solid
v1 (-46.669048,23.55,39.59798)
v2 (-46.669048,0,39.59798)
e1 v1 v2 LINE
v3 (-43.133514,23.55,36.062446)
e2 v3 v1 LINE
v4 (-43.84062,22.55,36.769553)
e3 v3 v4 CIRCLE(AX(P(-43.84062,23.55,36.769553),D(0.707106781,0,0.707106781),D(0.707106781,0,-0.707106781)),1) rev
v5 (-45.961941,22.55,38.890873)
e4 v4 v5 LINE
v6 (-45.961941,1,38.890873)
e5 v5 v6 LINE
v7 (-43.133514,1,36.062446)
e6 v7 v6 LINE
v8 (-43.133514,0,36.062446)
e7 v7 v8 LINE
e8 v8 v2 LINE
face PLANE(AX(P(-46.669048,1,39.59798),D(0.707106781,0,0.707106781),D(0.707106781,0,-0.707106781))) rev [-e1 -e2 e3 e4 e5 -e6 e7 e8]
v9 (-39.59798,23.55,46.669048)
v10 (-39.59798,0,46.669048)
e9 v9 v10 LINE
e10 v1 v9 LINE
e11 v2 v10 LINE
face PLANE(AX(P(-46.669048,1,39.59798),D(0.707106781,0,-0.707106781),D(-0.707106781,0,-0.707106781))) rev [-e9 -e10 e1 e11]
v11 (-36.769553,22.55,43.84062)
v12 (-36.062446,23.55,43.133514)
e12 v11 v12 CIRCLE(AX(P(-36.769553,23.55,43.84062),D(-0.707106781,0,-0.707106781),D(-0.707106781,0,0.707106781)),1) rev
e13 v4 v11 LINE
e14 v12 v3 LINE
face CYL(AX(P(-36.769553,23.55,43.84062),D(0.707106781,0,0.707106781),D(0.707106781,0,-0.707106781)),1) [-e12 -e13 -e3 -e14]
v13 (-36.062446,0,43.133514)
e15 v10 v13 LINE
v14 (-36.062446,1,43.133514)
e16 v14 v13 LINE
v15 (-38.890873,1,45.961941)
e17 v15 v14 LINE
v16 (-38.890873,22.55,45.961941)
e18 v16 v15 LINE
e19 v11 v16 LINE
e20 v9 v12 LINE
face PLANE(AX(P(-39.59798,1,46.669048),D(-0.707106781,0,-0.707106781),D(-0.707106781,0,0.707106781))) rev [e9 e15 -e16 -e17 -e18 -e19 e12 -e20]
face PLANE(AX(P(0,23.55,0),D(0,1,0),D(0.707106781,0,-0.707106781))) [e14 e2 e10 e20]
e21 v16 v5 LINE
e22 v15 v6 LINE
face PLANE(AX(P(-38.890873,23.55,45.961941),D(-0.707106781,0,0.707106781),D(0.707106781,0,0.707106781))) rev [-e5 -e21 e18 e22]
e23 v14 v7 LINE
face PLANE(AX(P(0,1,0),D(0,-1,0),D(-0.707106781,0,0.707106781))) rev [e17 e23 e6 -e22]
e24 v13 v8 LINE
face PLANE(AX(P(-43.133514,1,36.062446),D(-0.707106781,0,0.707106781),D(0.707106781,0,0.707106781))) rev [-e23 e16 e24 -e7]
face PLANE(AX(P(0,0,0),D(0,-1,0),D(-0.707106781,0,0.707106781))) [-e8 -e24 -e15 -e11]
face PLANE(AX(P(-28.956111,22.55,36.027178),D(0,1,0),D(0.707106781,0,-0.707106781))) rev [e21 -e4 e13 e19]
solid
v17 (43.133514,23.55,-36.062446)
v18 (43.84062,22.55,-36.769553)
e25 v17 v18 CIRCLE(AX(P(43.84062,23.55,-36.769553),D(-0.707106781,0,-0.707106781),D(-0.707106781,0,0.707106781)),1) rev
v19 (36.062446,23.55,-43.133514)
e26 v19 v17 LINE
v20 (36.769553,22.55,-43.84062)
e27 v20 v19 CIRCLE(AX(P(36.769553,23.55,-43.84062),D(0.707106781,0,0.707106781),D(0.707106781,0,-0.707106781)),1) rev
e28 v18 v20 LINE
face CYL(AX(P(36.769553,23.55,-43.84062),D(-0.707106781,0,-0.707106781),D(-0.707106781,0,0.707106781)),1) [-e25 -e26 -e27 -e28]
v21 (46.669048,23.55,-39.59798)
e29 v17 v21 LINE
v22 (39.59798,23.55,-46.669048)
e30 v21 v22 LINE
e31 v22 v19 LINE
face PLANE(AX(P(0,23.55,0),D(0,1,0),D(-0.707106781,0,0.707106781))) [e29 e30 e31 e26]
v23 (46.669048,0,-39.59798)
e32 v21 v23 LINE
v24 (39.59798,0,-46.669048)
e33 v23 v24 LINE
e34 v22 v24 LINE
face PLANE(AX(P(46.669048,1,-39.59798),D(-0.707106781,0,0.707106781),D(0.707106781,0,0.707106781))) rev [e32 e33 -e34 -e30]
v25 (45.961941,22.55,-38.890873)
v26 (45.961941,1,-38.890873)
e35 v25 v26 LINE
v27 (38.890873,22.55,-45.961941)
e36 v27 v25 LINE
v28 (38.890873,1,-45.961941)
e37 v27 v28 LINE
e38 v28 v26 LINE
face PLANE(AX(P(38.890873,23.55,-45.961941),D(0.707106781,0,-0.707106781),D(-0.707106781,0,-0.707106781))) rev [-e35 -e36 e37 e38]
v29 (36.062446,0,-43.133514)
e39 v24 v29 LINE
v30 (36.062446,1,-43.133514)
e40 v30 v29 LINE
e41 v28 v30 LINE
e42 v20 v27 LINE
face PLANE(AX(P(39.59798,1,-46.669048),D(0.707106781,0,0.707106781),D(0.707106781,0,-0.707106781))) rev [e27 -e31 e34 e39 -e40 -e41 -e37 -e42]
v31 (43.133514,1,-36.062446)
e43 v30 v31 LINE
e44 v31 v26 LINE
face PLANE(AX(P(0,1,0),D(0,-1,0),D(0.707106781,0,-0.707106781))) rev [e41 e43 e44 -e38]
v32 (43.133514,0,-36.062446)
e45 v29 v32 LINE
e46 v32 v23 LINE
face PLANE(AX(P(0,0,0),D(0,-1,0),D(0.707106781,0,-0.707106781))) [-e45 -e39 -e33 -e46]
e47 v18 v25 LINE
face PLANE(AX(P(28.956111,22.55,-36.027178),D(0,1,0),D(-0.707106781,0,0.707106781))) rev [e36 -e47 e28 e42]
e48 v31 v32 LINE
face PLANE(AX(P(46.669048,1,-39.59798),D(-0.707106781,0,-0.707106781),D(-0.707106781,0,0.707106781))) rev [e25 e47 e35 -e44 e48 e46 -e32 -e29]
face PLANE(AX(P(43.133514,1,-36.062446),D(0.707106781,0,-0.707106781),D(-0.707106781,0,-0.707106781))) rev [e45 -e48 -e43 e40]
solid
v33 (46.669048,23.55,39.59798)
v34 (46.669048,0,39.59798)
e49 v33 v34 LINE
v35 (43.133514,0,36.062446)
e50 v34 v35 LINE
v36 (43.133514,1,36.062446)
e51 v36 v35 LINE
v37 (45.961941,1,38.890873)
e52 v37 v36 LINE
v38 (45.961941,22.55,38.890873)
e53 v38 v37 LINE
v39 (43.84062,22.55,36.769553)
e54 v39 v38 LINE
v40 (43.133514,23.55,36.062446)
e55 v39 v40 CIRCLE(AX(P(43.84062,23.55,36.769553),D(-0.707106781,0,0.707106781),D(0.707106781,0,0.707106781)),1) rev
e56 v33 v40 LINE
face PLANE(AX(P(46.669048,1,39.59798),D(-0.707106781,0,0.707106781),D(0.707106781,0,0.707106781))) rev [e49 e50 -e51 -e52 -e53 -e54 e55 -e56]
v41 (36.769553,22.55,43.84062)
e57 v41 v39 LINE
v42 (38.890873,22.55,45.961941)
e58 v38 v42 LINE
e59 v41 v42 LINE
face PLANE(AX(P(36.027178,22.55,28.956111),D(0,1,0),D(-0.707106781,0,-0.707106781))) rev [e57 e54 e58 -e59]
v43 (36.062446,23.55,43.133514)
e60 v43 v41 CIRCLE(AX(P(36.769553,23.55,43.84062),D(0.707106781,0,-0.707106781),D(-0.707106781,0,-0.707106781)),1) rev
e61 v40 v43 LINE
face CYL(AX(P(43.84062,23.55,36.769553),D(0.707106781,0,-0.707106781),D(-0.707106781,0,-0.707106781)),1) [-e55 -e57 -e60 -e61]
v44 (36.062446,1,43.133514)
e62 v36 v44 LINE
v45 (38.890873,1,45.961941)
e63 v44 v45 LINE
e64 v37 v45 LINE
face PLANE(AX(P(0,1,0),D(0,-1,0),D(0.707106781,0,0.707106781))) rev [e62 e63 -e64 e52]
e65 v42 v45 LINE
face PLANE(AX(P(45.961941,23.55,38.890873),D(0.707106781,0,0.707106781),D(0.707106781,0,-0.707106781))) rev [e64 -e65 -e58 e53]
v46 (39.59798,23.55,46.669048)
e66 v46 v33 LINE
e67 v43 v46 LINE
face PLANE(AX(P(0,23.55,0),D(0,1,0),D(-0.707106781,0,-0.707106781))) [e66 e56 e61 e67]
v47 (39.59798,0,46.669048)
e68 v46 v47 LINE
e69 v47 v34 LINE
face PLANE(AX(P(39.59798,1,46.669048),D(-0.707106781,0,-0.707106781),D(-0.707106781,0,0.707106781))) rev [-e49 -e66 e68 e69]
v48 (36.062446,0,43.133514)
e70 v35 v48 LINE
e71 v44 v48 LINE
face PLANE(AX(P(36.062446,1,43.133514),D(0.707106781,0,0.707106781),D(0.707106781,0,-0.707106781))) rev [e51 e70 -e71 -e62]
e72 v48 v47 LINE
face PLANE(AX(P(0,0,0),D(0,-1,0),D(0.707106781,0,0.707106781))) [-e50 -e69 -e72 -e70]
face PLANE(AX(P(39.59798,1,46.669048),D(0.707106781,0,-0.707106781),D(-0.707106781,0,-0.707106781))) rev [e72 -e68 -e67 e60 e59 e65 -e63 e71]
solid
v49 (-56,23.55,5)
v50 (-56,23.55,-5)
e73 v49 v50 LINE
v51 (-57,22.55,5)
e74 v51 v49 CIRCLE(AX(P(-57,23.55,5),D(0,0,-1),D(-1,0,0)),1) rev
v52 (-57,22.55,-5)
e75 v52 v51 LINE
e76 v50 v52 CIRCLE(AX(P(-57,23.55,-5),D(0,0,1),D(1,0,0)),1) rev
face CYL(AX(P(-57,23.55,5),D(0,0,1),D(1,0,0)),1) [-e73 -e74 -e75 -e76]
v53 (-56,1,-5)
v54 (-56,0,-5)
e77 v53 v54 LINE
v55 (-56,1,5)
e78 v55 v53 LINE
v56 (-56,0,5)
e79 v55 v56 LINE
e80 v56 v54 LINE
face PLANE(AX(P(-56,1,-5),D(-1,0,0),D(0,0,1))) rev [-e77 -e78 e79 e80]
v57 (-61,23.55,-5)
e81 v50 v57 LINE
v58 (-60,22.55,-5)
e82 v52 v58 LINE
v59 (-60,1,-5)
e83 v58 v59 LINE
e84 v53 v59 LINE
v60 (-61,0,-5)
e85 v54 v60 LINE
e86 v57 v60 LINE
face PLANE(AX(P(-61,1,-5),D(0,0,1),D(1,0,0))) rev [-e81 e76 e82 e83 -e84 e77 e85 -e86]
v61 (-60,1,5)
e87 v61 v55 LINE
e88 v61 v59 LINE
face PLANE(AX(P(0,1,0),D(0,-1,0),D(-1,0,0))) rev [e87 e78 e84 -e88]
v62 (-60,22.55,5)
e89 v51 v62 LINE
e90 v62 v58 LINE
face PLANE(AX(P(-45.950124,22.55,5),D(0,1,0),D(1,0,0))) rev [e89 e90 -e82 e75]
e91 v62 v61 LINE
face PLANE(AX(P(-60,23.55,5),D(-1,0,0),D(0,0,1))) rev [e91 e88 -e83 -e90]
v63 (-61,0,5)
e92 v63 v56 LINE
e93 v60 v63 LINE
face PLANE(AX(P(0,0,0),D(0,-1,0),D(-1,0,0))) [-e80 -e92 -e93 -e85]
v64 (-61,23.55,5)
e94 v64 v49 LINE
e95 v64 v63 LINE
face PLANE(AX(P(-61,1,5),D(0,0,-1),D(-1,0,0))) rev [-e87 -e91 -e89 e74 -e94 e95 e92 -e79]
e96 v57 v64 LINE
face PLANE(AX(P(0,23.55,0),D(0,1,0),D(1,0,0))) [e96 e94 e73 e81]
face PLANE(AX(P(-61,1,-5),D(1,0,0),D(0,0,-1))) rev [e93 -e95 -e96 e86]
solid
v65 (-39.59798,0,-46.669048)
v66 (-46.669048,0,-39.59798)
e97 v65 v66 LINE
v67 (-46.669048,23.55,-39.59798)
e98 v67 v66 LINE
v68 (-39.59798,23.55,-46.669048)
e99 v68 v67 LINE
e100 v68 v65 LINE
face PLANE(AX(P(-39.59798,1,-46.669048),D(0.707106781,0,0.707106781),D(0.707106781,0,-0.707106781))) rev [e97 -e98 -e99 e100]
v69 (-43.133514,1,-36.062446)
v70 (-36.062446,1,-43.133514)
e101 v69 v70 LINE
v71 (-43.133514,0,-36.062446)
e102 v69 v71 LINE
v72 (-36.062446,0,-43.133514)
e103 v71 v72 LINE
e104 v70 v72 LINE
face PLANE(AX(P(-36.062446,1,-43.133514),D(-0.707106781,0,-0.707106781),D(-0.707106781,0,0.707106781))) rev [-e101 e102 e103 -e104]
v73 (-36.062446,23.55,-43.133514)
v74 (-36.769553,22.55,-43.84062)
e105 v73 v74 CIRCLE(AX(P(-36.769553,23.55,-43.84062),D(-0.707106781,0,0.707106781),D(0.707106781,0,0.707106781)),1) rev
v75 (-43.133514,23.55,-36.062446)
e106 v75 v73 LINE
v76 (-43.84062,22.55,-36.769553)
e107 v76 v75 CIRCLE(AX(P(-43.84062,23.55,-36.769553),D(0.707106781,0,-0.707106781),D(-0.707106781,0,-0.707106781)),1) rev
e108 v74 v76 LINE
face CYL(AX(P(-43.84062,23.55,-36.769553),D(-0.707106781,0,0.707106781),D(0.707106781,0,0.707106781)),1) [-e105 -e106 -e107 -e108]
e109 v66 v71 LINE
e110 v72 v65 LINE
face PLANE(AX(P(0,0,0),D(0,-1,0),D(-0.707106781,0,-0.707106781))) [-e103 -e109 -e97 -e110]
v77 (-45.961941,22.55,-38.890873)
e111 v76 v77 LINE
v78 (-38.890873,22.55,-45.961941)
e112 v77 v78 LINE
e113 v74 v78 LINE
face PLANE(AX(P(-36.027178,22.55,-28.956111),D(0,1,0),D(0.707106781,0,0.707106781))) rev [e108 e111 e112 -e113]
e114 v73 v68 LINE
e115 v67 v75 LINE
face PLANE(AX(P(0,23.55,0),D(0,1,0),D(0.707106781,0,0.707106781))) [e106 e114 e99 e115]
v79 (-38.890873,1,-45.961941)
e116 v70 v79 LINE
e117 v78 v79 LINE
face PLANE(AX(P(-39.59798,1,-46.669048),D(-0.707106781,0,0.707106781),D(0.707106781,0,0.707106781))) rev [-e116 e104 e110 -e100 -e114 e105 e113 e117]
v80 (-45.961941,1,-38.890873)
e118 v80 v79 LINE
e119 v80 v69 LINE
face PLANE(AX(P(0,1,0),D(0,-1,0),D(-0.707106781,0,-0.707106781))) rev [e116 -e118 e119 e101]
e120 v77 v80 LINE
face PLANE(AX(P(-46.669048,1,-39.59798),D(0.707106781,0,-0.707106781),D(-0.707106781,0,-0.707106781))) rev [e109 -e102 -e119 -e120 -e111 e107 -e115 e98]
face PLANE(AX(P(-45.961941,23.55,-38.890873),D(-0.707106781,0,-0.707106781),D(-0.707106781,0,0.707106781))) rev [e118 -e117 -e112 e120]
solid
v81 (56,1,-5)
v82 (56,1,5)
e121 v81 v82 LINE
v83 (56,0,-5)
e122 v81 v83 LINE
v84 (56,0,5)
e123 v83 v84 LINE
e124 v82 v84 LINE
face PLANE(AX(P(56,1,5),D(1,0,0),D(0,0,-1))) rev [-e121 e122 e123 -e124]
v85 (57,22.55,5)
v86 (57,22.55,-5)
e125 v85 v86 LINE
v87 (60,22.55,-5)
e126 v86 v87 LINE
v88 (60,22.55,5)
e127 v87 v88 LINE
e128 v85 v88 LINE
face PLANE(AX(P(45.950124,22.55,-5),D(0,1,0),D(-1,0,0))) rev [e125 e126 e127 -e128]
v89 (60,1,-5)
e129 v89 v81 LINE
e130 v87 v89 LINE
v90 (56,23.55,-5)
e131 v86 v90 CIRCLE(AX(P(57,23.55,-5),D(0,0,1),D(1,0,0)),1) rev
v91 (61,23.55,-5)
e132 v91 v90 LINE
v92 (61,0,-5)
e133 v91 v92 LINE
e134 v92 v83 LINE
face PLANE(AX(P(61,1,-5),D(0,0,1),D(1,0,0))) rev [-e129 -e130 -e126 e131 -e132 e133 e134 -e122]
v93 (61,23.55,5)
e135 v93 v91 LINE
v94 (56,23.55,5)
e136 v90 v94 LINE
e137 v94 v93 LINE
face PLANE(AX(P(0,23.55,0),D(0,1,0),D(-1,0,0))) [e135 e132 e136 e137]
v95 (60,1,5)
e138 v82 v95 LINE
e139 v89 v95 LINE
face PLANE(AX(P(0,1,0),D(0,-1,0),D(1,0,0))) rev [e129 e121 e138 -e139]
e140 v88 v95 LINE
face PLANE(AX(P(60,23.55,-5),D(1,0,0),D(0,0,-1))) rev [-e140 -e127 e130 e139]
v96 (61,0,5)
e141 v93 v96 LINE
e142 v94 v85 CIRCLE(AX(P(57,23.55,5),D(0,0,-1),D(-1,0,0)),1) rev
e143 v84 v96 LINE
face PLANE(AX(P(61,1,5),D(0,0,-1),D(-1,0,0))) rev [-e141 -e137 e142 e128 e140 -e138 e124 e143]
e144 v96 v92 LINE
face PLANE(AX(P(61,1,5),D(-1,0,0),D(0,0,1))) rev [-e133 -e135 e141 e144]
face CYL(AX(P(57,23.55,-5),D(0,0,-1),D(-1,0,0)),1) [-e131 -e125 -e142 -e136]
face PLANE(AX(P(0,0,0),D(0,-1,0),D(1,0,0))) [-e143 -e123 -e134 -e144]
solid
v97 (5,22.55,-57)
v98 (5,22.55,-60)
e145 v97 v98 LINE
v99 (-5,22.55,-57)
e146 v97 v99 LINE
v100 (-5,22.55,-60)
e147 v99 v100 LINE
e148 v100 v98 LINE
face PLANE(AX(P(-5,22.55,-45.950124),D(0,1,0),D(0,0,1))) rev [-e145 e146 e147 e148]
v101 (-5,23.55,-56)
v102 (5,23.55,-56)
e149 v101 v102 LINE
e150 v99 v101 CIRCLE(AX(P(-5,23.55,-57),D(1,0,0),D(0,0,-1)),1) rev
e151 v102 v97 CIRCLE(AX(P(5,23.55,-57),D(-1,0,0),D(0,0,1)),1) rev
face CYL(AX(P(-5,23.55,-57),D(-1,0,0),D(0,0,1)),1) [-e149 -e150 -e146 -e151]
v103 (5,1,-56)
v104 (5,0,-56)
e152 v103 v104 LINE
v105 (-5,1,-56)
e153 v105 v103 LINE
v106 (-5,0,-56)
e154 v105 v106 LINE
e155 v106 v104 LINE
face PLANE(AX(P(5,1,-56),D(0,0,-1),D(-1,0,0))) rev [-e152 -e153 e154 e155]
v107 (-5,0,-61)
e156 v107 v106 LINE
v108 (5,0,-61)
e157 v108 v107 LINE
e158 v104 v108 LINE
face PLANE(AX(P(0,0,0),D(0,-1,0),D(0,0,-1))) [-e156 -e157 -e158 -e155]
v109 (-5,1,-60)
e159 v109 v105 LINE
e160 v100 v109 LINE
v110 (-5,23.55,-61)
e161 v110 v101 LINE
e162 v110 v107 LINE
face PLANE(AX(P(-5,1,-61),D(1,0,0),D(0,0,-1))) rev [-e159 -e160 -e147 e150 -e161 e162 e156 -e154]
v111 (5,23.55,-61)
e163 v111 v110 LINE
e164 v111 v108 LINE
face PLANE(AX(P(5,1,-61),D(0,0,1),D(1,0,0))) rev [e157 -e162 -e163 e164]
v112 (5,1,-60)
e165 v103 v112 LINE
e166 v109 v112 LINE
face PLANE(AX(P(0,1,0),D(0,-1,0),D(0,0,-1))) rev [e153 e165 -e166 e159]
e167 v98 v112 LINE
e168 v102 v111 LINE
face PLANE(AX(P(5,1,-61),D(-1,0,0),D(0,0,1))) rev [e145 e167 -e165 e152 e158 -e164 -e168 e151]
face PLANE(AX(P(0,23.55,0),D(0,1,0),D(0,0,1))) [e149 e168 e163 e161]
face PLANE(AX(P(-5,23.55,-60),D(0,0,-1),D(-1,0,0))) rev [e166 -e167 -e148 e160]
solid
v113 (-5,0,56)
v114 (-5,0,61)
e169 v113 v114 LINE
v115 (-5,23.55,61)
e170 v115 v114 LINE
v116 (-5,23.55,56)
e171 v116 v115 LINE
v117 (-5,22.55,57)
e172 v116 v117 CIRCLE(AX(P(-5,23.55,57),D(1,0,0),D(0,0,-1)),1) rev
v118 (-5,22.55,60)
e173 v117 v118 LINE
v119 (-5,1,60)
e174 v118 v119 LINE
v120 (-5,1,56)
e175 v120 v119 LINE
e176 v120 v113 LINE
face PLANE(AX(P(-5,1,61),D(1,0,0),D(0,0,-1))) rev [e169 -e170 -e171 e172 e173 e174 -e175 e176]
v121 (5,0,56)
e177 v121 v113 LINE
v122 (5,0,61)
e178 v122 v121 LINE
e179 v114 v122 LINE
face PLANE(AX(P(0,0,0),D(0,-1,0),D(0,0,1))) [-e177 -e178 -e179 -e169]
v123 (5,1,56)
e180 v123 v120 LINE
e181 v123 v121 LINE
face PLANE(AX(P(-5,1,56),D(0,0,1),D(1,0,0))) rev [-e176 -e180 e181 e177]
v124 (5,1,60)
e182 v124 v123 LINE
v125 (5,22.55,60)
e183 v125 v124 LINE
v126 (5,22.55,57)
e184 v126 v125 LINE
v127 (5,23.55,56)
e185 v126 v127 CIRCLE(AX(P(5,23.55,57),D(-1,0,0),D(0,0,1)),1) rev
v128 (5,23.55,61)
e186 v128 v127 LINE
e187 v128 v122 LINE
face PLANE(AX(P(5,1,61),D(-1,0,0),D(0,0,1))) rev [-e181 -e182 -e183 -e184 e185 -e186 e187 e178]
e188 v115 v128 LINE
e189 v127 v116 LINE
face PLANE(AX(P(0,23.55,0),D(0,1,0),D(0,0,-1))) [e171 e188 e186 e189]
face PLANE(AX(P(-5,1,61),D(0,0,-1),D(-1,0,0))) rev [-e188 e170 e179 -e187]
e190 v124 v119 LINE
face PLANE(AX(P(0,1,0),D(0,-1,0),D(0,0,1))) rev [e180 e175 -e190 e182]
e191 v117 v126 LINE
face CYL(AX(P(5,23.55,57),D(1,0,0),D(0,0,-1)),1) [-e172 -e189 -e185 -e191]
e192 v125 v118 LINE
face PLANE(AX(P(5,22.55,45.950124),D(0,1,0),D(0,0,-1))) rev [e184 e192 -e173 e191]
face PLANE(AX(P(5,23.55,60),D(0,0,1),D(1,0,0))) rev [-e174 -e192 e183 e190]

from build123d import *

# Parameters (mm, degrees)
SKETCH1_W           = 10
SKETCH1_H           = 5
BOSS_EXTRUDE1_DEPTH = 1
SKETCH2_W           = 10
SKETCH2_H           = 1
BOSS_EXTRUDE2_DEPTH = 22.55
SKETCH3_W           = 10
SKETCH3_H           = 1
BOSS_EXTRUDE3_DEPTH = 4
FILLET1_R           = 1
CIRPATTERN1_COUNT   = 8


with BuildPart() as part:
    # Sketch1 → Boss-Extrude1 (new body)
    with BuildSketch(Plane(origin=(0, 0, 0), x_dir=(1, 0, 0), z_dir=(0, 1, 0))):
        with Locations((0, 58.5)):
            Rectangle(SKETCH1_W, SKETCH1_H)
    extrude(amount=BOSS_EXTRUDE1_DEPTH)

    # Sketch2 → Boss-Extrude2 (add)
    with BuildSketch(Plane(origin=(0, 1, 0), x_dir=(1, 0, 0), z_dir=(0, 1, 0))):
        with Locations((0, 60.5)):
            Rectangle(SKETCH2_W, SKETCH2_H)
    extrude(amount=BOSS_EXTRUDE2_DEPTH)

    # Sketch3 → Boss-Extrude3 (add)
    with BuildSketch(Plane.XY.offset(-60)):
        with Locations((0, 23.05)):
            Rectangle(SKETCH3_W, SKETCH3_H)
    extrude(amount=BOSS_EXTRUDE3_DEPTH)

    # Fillet1
    fillet1_edges = [part.edges().sort_by_distance(p)[0] for p in [
        (0, 22.55, -56),
    ]]
    fillet(fillet1_edges, radius=FILLET1_R - 0.0001)  # a hair under: the kernel refuses the full size


with BuildPart() as cirpattern1_1:
    # CirPattern1: pattern copy
    add(part.part.rotate(Axis((0, 0, 0), (0, 1, 0)), 1 * 360 / CIRPATTERN1_COUNT))


with BuildPart() as cirpattern1_2:
    # CirPattern1: pattern copy
    add(part.part.rotate(Axis((0, 0, 0), (0, 1, 0)), 2 * 360 / CIRPATTERN1_COUNT))


with BuildPart() as cirpattern1_3:
    # CirPattern1: pattern copy
    add(part.part.rotate(Axis((0, 0, 0), (0, 1, 0)), 3 * 360 / CIRPATTERN1_COUNT))


with BuildPart() as cirpattern1_4:
    # CirPattern1: pattern copy
    add(part.part.rotate(Axis((0, 0, 0), (0, 1, 0)), 4 * 360 / CIRPATTERN1_COUNT))


with BuildPart() as cirpattern1_5:
    # CirPattern1: pattern copy
    add(part.part.rotate(Axis((0, 0, 0), (0, 1, 0)), 5 * 360 / CIRPATTERN1_COUNT))


with BuildPart() as cirpattern1_6:
    # CirPattern1: pattern copy
    add(part.part.rotate(Axis((0, 0, 0), (0, 1, 0)), 6 * 360 / CIRPATTERN1_COUNT))


with BuildPart() as cirpattern1_7:
    # CirPattern1: pattern copy
    add(part.part.rotate(Axis((0, 0, 0), (0, 1, 0)), 7 * 360 / CIRPATTERN1_COUNT))


solid = Compound([part.part, cirpattern1_1.part, cirpattern1_2.part, cirpattern1_3.part, cirpattern1_4.part, cirpattern1_5.part, cirpattern1_6.part, cirpattern1_7.part])
